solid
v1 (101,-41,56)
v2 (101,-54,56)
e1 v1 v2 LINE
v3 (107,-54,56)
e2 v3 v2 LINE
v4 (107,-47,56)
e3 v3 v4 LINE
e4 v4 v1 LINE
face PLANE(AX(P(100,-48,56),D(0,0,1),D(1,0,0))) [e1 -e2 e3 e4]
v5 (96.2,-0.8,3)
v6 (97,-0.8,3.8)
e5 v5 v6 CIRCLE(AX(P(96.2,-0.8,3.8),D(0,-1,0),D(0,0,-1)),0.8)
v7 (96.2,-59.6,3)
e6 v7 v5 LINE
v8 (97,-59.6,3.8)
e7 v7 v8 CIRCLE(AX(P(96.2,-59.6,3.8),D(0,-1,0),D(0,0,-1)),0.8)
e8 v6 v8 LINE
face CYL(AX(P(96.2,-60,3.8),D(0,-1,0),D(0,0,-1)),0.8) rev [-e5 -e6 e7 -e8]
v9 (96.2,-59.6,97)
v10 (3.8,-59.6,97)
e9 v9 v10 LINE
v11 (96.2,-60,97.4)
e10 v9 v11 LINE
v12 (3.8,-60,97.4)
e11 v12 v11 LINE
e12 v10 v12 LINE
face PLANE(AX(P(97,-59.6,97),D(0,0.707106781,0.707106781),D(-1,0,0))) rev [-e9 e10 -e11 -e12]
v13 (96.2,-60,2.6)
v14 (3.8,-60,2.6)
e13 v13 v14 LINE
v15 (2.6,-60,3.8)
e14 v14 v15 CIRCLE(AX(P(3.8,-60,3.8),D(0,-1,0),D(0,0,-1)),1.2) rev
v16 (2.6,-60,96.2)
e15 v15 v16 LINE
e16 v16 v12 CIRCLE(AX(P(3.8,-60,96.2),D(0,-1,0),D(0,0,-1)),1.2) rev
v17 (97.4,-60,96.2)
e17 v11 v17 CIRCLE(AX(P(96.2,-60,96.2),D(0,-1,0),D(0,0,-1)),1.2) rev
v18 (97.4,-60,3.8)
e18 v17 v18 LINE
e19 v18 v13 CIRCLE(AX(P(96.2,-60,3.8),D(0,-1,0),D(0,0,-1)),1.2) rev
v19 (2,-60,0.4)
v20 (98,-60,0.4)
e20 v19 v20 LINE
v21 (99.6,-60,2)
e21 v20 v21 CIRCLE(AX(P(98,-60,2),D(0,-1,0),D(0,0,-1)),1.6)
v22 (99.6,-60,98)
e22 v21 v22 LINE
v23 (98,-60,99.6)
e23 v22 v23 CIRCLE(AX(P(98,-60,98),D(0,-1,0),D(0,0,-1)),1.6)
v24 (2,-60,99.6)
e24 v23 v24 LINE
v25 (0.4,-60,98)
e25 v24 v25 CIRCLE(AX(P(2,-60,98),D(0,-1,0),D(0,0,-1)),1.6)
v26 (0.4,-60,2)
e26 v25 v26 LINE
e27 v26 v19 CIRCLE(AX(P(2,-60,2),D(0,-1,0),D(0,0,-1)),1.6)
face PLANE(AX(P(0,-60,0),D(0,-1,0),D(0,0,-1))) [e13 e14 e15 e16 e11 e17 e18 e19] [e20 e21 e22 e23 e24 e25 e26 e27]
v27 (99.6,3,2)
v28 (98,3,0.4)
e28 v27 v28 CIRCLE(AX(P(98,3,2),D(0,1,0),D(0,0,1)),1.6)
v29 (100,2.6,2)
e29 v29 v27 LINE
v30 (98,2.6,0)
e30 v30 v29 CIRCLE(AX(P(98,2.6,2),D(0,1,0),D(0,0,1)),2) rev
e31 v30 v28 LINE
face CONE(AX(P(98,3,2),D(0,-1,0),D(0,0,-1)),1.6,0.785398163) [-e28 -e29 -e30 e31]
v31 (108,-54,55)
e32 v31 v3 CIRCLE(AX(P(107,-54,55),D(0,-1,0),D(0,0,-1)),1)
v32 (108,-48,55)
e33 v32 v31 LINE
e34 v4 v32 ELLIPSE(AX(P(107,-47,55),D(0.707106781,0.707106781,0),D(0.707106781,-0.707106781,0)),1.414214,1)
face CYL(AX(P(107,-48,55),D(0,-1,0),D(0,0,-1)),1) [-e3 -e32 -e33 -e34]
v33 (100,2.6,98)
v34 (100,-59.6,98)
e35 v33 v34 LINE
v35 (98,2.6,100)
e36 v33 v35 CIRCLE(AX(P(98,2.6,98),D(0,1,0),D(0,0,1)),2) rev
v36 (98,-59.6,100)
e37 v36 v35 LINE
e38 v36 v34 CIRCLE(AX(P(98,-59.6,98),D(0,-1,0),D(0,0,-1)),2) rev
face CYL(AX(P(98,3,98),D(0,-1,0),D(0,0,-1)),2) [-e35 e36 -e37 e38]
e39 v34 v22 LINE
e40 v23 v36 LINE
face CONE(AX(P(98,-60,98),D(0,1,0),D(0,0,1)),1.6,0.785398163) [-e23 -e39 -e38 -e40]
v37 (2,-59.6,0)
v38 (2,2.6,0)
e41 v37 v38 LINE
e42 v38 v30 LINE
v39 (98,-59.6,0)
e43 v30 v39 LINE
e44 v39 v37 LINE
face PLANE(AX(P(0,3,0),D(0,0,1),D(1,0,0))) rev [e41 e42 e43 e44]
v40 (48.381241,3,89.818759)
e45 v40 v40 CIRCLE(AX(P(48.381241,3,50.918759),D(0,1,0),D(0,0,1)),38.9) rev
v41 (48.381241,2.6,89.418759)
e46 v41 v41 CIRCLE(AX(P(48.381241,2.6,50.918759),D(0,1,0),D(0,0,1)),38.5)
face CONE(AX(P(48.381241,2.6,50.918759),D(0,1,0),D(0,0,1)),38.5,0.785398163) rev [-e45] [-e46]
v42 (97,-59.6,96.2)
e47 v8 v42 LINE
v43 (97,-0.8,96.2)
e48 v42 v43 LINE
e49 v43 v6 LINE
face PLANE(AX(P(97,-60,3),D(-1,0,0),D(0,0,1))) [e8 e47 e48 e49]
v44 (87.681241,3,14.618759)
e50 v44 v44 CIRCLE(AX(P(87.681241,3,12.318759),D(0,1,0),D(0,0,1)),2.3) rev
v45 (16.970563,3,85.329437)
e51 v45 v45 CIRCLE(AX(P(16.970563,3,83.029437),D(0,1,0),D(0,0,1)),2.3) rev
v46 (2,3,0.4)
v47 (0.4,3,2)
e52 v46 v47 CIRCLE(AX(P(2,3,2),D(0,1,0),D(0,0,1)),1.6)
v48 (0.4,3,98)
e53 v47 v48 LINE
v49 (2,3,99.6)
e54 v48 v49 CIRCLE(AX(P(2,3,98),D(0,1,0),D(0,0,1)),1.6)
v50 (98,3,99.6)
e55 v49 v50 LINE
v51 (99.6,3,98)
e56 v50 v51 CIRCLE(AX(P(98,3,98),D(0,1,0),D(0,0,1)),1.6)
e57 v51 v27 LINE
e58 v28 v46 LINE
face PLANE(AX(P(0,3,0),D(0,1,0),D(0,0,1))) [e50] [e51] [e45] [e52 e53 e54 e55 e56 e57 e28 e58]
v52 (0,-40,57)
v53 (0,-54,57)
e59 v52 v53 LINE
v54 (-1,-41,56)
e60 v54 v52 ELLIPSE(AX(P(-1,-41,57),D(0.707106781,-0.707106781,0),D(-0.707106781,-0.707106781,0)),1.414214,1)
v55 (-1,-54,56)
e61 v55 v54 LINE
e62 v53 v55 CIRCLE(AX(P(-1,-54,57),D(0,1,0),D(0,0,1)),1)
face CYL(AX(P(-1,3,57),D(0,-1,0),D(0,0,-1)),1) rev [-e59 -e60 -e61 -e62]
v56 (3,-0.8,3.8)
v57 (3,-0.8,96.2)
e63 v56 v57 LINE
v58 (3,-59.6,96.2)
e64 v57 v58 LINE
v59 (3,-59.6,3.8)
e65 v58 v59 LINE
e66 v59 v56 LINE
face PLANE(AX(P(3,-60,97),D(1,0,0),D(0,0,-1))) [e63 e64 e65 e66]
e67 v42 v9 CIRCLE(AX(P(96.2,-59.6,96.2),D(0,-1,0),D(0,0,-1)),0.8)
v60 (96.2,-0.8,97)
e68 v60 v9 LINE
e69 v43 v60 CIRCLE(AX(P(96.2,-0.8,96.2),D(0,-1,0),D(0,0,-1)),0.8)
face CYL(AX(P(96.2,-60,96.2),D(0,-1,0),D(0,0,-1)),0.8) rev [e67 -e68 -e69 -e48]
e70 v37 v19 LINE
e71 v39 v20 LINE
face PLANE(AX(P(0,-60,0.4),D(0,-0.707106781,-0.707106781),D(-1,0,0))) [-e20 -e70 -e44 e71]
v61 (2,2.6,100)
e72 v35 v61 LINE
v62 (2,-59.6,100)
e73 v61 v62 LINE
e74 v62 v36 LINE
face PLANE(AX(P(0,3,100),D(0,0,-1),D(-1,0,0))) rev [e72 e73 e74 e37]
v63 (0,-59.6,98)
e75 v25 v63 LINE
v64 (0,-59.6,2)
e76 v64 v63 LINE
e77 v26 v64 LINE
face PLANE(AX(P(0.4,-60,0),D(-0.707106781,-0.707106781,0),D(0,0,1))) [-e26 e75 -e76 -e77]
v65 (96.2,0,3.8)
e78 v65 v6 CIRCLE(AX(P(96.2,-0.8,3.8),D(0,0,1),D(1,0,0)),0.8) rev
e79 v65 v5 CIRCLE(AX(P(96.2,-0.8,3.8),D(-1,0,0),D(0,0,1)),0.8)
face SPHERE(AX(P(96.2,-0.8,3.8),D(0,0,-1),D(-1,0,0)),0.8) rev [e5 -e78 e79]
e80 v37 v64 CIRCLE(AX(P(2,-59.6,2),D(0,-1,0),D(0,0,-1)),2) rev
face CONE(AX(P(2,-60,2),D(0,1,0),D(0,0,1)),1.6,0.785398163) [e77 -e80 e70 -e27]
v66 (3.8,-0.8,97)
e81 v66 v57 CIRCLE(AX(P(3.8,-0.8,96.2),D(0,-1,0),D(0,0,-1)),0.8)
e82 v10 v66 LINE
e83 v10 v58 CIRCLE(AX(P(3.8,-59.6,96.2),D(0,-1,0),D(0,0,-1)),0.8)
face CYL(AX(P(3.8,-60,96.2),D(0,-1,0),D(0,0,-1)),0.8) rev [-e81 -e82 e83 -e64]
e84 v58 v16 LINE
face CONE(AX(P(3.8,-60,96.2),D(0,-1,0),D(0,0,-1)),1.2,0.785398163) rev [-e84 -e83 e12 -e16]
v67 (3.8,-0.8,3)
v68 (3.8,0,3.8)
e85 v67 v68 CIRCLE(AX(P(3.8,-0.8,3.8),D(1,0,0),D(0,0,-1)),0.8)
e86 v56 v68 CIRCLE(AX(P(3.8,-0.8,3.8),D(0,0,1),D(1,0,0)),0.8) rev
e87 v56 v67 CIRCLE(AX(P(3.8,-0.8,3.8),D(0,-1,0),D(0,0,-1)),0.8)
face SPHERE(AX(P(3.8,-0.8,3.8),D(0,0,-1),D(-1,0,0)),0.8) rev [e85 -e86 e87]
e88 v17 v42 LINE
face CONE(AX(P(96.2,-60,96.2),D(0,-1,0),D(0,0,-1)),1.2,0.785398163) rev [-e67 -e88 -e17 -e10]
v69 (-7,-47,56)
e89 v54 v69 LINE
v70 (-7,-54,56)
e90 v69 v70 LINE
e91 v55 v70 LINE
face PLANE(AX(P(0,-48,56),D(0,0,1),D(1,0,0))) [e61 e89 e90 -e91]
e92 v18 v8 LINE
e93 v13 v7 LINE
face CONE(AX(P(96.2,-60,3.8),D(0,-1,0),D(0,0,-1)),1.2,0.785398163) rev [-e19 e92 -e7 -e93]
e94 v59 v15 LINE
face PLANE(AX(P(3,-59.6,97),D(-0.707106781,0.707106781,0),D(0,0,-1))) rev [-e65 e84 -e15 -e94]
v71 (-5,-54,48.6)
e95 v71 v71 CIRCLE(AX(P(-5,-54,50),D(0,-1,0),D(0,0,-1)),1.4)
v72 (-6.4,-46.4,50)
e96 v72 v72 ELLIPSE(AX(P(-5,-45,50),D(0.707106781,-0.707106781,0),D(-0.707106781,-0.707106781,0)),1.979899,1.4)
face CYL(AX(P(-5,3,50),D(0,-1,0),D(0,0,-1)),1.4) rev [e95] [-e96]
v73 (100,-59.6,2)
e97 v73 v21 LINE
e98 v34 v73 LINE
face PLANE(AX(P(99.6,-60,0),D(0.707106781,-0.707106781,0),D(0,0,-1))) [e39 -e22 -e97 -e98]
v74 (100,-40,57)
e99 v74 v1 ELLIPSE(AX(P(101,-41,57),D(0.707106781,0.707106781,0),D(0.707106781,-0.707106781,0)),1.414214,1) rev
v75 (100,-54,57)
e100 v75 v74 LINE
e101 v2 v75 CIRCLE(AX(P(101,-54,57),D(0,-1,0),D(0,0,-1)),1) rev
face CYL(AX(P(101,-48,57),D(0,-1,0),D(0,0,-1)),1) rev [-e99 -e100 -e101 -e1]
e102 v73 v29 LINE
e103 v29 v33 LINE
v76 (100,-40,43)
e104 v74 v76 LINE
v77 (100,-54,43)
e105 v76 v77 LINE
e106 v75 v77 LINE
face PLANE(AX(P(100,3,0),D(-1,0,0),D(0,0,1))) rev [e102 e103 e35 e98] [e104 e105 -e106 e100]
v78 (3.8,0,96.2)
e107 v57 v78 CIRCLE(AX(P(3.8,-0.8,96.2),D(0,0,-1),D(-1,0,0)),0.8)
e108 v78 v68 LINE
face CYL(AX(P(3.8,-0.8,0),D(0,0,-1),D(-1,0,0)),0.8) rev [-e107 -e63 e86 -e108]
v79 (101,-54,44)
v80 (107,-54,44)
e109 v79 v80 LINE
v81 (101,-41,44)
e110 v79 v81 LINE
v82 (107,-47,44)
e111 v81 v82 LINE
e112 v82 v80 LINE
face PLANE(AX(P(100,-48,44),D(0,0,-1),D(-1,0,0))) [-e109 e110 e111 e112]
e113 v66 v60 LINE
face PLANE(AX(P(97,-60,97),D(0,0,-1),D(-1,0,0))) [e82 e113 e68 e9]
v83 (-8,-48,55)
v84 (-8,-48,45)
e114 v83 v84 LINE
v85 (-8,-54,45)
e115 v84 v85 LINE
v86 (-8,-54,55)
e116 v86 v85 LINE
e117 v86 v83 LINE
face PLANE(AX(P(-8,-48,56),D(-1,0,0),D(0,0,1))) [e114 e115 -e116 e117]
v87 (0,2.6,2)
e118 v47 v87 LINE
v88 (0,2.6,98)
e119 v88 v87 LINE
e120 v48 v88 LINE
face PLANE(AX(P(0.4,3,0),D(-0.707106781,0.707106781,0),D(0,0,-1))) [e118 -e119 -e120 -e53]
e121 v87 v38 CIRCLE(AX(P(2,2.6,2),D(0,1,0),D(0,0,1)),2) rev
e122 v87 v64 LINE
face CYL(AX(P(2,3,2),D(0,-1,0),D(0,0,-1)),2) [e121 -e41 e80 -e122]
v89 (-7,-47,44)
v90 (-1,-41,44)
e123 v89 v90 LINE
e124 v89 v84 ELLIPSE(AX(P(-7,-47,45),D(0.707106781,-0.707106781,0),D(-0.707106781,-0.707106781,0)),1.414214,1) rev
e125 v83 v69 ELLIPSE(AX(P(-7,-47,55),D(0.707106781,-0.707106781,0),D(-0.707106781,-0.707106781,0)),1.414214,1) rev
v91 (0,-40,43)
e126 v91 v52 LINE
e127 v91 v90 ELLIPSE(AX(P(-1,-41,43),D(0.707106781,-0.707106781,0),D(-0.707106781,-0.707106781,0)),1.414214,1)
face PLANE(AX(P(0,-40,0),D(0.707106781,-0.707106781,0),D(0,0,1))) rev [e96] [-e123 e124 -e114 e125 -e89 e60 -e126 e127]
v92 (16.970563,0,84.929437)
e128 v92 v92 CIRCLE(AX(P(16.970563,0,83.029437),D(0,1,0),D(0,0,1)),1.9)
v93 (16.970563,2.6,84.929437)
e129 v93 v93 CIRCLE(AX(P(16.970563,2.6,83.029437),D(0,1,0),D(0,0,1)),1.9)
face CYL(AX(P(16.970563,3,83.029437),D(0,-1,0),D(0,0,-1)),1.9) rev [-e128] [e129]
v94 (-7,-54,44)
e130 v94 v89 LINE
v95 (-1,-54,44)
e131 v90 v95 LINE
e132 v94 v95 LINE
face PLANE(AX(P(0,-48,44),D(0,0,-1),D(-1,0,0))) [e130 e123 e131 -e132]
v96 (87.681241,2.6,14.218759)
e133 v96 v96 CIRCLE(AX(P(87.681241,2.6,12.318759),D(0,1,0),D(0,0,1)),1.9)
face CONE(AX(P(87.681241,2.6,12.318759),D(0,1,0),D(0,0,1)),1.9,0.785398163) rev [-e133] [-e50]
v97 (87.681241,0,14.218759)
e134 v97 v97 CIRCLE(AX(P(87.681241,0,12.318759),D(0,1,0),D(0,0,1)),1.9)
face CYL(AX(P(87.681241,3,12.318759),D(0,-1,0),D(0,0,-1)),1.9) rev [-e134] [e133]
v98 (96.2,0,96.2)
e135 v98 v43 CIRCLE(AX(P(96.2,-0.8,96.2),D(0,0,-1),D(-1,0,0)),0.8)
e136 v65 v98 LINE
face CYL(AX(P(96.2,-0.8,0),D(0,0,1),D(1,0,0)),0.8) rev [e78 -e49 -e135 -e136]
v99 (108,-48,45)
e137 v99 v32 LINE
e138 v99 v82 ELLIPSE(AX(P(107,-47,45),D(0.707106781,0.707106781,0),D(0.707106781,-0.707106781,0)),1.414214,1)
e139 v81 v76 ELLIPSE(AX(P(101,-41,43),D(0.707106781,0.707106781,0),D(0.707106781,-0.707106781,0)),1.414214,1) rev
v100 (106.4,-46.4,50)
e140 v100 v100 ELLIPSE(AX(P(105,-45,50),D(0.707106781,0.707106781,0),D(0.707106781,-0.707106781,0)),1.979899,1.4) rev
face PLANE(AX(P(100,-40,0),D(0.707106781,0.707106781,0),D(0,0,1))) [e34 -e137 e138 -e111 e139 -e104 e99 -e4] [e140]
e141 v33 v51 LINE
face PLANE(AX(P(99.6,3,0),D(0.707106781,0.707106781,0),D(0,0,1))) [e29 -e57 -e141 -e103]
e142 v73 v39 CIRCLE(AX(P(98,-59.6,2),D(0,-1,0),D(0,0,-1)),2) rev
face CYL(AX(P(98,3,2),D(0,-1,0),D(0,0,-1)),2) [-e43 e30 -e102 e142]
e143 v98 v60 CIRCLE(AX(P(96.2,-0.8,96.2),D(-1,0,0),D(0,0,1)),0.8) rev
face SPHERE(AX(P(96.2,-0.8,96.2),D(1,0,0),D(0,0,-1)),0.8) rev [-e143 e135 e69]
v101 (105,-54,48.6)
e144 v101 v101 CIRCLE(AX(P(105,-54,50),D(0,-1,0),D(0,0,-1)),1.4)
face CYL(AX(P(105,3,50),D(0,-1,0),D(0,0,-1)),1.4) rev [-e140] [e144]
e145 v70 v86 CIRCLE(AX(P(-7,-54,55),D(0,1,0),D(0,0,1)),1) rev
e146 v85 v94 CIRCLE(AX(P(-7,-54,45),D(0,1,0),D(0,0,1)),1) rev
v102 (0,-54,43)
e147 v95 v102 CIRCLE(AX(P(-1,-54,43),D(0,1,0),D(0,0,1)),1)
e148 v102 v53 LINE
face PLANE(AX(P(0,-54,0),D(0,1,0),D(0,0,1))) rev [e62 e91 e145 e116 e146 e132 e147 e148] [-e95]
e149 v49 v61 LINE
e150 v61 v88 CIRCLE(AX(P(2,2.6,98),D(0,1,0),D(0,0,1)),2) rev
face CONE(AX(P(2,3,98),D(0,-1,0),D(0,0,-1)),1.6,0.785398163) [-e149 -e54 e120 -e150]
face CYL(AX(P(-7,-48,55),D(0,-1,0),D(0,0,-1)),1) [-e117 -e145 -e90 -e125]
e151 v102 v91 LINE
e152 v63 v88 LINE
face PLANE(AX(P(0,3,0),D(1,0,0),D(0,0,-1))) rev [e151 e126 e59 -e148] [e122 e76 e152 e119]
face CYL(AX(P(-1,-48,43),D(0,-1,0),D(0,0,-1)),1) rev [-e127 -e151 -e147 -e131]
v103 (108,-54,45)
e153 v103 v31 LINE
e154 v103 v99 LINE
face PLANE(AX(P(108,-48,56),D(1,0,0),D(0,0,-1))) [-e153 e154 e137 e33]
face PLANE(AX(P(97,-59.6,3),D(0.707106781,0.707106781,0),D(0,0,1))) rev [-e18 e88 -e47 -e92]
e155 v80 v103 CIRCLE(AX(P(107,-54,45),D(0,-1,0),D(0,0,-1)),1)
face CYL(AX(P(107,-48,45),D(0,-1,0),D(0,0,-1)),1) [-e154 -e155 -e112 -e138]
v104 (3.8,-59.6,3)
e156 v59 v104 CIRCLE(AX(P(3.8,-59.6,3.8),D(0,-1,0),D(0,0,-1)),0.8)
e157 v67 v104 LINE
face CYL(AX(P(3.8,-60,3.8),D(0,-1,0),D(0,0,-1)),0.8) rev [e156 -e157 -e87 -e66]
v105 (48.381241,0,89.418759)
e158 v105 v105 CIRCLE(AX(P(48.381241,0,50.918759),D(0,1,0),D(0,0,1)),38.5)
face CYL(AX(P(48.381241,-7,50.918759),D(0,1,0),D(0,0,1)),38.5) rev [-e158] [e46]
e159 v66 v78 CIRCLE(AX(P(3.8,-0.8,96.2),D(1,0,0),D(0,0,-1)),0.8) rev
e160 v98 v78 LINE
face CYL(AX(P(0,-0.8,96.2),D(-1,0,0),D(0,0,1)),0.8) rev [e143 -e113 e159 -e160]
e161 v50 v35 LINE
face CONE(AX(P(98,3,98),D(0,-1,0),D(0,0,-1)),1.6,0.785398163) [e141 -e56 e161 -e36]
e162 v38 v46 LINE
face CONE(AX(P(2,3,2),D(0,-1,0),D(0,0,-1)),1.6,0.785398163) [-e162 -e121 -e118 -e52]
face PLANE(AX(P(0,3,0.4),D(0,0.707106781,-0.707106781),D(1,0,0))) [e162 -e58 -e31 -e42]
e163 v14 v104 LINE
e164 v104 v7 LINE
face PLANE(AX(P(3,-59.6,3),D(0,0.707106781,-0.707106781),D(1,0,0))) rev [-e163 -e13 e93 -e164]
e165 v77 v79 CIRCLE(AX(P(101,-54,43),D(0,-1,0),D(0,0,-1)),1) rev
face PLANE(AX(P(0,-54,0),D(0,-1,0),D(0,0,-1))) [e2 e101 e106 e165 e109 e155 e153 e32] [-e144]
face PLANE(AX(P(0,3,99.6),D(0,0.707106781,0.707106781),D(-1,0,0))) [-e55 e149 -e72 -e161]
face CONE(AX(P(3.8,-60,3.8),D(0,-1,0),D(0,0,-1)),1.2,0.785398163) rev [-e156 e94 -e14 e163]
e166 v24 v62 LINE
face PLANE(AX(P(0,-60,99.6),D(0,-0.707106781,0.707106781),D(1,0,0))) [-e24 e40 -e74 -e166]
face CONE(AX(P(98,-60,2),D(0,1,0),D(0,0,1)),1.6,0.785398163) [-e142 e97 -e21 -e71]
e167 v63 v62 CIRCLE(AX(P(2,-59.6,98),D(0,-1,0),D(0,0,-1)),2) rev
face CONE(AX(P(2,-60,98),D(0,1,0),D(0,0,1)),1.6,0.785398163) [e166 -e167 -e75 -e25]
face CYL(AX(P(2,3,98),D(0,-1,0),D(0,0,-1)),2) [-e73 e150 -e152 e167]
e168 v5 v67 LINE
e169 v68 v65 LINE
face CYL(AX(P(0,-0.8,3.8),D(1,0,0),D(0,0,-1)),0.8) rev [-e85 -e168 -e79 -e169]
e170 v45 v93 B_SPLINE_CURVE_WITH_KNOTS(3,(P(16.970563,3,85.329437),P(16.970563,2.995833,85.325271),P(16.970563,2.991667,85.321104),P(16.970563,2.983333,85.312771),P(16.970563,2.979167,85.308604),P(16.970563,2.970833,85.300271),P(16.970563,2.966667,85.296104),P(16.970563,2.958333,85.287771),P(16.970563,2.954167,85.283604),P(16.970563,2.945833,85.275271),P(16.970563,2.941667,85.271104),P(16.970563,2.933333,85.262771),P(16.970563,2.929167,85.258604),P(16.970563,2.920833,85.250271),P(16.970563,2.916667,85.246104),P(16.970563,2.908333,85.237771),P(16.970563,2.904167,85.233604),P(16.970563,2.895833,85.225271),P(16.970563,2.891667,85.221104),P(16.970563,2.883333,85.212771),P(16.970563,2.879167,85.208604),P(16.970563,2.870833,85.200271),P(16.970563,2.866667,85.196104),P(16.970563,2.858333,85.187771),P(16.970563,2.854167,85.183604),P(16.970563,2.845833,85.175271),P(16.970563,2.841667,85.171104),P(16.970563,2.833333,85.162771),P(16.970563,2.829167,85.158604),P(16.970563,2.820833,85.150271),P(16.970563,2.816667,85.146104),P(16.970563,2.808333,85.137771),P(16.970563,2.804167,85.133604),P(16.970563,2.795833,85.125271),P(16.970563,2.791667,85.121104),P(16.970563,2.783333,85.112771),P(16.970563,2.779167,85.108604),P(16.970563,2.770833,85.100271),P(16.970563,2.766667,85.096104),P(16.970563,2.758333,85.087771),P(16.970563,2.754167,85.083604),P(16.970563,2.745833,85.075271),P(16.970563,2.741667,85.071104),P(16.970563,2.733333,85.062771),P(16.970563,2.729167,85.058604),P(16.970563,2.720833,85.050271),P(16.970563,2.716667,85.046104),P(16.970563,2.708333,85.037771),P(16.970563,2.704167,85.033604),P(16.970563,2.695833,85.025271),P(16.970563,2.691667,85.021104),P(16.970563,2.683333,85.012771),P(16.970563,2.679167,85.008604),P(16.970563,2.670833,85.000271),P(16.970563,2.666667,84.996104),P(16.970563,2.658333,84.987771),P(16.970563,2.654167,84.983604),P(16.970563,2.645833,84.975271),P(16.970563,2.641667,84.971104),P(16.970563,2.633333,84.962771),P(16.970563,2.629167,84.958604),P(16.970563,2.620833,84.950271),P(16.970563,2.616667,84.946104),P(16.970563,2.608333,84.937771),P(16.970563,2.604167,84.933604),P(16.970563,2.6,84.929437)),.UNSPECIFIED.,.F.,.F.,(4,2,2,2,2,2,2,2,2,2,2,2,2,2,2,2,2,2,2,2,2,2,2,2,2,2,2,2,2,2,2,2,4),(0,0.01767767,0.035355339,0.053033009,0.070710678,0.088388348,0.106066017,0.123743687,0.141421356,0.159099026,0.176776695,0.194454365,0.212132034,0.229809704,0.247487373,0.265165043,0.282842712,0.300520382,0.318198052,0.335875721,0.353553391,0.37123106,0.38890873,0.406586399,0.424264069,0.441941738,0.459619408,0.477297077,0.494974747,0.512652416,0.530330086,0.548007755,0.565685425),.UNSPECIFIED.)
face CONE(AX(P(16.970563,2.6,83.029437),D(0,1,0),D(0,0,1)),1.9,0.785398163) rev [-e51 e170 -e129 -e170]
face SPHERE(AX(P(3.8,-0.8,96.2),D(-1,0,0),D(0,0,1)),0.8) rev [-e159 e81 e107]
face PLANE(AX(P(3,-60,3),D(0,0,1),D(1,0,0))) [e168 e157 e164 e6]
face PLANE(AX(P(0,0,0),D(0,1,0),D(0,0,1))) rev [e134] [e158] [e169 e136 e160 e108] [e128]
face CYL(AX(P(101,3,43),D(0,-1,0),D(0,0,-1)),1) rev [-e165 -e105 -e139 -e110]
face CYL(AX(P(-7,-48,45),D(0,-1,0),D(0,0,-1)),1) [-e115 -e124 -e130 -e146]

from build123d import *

# Parameters (mm, degrees)
SKETCH_1_W          = 100
SKETCH_1_H          = 100
SKETCH_1_R          = 1.9
EXTRUDE_1_DEPTH     = 3
SKETCH_2_R          = 38.5
CUT_EXTRUDE_1_DEPTH = 10
SKETCH_3_W          = 100
SKETCH_3_H          = 100
SKETCH_3_W_2        = 94
SKETCH_3_H_2        = 94
EXTRUDE_2_DEPTH     = 60
FILLET_1_R          = 2
CHAMFER_1_SIZE      = 0.4
FILLET_2_R          = 0.8
CHAMFER_2_SIZE      = 0.4
SKETCH_4_W          = 8
SKETCH_4_H          = 12
EXTRUDE_3_DEPTH     = 6
CHAMFER_3_SIZE      = 8
SKETCH_5_R          = 1.4
CUT_EXTRUDE_2_DEPTH = 158.838525082
FILLET_3_R          = 1


with BuildPart() as part:
    # 草图1 → 凸台-拉伸1 (new body)
    with BuildSketch(Plane(origin=(0, 0, 0), x_dir=(1, 0, 0), z_dir=(0, 1, 0))):
        with Locations((50, -50)):
            Rectangle(SKETCH_1_W, SKETCH_1_H)
        with Locations(Location((16.970562748, -83.029437252, 0), (0, 0, 270))):
            Circle(SKETCH_1_R, mode=Mode.SUBTRACT)
        with Locations(Location((87.681240867, -12.318759133, 0), (0, 0, 270))):
            Circle(SKETCH_1_R, mode=Mode.SUBTRACT)
    extrude(amount=EXTRUDE_1_DEPTH)

    # 草图2 → 切除-拉伸1 (cut)
    with BuildSketch(Plane(origin=(0, 3, 0), x_dir=(1, 0, 0), z_dir=(0, 1, 0))):
        with Locations(Location((48.381240867, -50.918759133, 0), (0, 0, 270))):
            Circle(SKETCH_2_R)
    extrude(amount=-CUT_EXTRUDE_1_DEPTH, mode=Mode.SUBTRACT)

    # 草图3 → 凸台-拉伸2 (add)
    with BuildSketch(Plane.XZ):
        with Locations((50, 50)):
            Rectangle(SKETCH_3_W, SKETCH_3_H)
        with Locations((50, 50)):
            Rectangle(SKETCH_3_W_2, SKETCH_3_H_2, mode=Mode.SUBTRACT)
    extrude(amount=EXTRUDE_2_DEPTH)

    # 圆角1
    fillet_1_edges = [part.edges().sort_by_distance(p)[0] for p in [
        (0, -28.5, 0),
        (100, -28.5, 0),
        (100, -28.5, 100),
        (0, -28.5, 100),
    ]]
    fillet(fillet_1_edges, radius=FILLET_1_R)

    # 倒角1
    chamfer_1_edges = [part.edges().sort_by_distance(p)[0] for p in [
        (16.970562748, 3, 81.129437252),
        (87.681240867, 3, 10.418759133),
        (48.381240867, 3, 12.418759133),
        (50, 3, 0),
        (100, 3, 50),
        (0, 3, 50),
        (50, 3, 100),
        (0.585786438, 3, 99.414213562),
        (0.585786438, 3, 0.585786438),
        (99.414213562, 3, 99.414213562),
        (99.414213562, 3, 0.585786438),
    ]]
    chamfer(chamfer_1_edges, length=CHAMFER_1_SIZE)

    # 圆角2
    fillet_2_edges = [part.edges().sort_by_distance(p)[0] for p in [
        (50, 0, 97),
        (3, 0, 50),
        (50, 0, 3),
        (97, 0, 50),
        (3, -30, 97),
        (3, -30, 3),
        (97, -30, 3),
        (97, -30, 97),
    ]]
    fillet(fillet_2_edges, radius=FILLET_2_R)

    # 倒角2
    chamfer_2_edges = [part.edges().sort_by_distance(p)[0] for p in [
        (50, -60, 97),
        (97, -60, 50),
        (50, -60, 3),
        (3, -60, 50),
        (3.234314575, -60, 3.234314575),
        (96.765685425, -60, 3.234314575),
        (96.765685425, -60, 96.765685425),
        (3.234314575, -60, 96.765685425),
        (50, -60, 0),
        (50, -60, 100),
        (0, -60, 50),
        (100, -60, 50),
        (0.585786438, -60, 99.414213562),
        (0.585786438, -60, 0.585786438),
        (99.414213562, -60, 99.414213562),
        (99.414213562, -60, 0.585786438),
    ]]
    chamfer(chamfer_2_edges, length=CHAMFER_2_SIZE)

    # 草图4 → 凸台-拉伸3 (add)
    with BuildSketch(Plane(origin=(0, -54, 0), x_dir=(-1, 0, 0), z_dir=(0, -1, 0))):
        with Locations((-104, -50)):
            Rectangle(SKETCH_4_W, SKETCH_4_H)
        with Locations((4, -50)):
            Rectangle(SKETCH_4_W, SKETCH_4_H)
    extrude(amount=-EXTRUDE_3_DEPTH)

    # 倒角3
    chamfer_3_edges = [part.edges().sort_by_distance(p)[0] for p in [
        (0, -48, 50),
        (100, -48, 50),
    ]]
    chamfer(chamfer_3_edges, length=CHAMFER_3_SIZE - 0.0001)  # a hair under: the kernel refuses the full size

    # 草图5 → 切除-拉伸2 (cut, through all)
    with BuildSketch(Plane(origin=(0, -54, 0), x_dir=(-1, 0, 0), z_dir=(0, -1, 0))):
        with Locations(Location((5, -50, 0), (0, 0, 90))):
            Circle(SKETCH_5_R)
        with Locations(Location((-105, -50, 0), (0, 0, 90))):
            Circle(SKETCH_5_R)
    extrude(amount=-CUT_EXTRUDE_2_DEPTH, mode=Mode.SUBTRACT)

    # 圆角3
    fillet_3_edges = [part.edges().sort_by_distance(p)[0] for p in [
        (100, -47.00005, 44),
        (100, -47.00005, 56),
        (108, -51, 56),
        (108, -51, 44),
        (0, -47.00005, 56),
        (0, -47.00005, 44),
        (-8, -51, 44),
        (-8, -51, 56),
    ]]
    fillet(fillet_3_edges, radius=FILLET_3_R)


solid = part.part
